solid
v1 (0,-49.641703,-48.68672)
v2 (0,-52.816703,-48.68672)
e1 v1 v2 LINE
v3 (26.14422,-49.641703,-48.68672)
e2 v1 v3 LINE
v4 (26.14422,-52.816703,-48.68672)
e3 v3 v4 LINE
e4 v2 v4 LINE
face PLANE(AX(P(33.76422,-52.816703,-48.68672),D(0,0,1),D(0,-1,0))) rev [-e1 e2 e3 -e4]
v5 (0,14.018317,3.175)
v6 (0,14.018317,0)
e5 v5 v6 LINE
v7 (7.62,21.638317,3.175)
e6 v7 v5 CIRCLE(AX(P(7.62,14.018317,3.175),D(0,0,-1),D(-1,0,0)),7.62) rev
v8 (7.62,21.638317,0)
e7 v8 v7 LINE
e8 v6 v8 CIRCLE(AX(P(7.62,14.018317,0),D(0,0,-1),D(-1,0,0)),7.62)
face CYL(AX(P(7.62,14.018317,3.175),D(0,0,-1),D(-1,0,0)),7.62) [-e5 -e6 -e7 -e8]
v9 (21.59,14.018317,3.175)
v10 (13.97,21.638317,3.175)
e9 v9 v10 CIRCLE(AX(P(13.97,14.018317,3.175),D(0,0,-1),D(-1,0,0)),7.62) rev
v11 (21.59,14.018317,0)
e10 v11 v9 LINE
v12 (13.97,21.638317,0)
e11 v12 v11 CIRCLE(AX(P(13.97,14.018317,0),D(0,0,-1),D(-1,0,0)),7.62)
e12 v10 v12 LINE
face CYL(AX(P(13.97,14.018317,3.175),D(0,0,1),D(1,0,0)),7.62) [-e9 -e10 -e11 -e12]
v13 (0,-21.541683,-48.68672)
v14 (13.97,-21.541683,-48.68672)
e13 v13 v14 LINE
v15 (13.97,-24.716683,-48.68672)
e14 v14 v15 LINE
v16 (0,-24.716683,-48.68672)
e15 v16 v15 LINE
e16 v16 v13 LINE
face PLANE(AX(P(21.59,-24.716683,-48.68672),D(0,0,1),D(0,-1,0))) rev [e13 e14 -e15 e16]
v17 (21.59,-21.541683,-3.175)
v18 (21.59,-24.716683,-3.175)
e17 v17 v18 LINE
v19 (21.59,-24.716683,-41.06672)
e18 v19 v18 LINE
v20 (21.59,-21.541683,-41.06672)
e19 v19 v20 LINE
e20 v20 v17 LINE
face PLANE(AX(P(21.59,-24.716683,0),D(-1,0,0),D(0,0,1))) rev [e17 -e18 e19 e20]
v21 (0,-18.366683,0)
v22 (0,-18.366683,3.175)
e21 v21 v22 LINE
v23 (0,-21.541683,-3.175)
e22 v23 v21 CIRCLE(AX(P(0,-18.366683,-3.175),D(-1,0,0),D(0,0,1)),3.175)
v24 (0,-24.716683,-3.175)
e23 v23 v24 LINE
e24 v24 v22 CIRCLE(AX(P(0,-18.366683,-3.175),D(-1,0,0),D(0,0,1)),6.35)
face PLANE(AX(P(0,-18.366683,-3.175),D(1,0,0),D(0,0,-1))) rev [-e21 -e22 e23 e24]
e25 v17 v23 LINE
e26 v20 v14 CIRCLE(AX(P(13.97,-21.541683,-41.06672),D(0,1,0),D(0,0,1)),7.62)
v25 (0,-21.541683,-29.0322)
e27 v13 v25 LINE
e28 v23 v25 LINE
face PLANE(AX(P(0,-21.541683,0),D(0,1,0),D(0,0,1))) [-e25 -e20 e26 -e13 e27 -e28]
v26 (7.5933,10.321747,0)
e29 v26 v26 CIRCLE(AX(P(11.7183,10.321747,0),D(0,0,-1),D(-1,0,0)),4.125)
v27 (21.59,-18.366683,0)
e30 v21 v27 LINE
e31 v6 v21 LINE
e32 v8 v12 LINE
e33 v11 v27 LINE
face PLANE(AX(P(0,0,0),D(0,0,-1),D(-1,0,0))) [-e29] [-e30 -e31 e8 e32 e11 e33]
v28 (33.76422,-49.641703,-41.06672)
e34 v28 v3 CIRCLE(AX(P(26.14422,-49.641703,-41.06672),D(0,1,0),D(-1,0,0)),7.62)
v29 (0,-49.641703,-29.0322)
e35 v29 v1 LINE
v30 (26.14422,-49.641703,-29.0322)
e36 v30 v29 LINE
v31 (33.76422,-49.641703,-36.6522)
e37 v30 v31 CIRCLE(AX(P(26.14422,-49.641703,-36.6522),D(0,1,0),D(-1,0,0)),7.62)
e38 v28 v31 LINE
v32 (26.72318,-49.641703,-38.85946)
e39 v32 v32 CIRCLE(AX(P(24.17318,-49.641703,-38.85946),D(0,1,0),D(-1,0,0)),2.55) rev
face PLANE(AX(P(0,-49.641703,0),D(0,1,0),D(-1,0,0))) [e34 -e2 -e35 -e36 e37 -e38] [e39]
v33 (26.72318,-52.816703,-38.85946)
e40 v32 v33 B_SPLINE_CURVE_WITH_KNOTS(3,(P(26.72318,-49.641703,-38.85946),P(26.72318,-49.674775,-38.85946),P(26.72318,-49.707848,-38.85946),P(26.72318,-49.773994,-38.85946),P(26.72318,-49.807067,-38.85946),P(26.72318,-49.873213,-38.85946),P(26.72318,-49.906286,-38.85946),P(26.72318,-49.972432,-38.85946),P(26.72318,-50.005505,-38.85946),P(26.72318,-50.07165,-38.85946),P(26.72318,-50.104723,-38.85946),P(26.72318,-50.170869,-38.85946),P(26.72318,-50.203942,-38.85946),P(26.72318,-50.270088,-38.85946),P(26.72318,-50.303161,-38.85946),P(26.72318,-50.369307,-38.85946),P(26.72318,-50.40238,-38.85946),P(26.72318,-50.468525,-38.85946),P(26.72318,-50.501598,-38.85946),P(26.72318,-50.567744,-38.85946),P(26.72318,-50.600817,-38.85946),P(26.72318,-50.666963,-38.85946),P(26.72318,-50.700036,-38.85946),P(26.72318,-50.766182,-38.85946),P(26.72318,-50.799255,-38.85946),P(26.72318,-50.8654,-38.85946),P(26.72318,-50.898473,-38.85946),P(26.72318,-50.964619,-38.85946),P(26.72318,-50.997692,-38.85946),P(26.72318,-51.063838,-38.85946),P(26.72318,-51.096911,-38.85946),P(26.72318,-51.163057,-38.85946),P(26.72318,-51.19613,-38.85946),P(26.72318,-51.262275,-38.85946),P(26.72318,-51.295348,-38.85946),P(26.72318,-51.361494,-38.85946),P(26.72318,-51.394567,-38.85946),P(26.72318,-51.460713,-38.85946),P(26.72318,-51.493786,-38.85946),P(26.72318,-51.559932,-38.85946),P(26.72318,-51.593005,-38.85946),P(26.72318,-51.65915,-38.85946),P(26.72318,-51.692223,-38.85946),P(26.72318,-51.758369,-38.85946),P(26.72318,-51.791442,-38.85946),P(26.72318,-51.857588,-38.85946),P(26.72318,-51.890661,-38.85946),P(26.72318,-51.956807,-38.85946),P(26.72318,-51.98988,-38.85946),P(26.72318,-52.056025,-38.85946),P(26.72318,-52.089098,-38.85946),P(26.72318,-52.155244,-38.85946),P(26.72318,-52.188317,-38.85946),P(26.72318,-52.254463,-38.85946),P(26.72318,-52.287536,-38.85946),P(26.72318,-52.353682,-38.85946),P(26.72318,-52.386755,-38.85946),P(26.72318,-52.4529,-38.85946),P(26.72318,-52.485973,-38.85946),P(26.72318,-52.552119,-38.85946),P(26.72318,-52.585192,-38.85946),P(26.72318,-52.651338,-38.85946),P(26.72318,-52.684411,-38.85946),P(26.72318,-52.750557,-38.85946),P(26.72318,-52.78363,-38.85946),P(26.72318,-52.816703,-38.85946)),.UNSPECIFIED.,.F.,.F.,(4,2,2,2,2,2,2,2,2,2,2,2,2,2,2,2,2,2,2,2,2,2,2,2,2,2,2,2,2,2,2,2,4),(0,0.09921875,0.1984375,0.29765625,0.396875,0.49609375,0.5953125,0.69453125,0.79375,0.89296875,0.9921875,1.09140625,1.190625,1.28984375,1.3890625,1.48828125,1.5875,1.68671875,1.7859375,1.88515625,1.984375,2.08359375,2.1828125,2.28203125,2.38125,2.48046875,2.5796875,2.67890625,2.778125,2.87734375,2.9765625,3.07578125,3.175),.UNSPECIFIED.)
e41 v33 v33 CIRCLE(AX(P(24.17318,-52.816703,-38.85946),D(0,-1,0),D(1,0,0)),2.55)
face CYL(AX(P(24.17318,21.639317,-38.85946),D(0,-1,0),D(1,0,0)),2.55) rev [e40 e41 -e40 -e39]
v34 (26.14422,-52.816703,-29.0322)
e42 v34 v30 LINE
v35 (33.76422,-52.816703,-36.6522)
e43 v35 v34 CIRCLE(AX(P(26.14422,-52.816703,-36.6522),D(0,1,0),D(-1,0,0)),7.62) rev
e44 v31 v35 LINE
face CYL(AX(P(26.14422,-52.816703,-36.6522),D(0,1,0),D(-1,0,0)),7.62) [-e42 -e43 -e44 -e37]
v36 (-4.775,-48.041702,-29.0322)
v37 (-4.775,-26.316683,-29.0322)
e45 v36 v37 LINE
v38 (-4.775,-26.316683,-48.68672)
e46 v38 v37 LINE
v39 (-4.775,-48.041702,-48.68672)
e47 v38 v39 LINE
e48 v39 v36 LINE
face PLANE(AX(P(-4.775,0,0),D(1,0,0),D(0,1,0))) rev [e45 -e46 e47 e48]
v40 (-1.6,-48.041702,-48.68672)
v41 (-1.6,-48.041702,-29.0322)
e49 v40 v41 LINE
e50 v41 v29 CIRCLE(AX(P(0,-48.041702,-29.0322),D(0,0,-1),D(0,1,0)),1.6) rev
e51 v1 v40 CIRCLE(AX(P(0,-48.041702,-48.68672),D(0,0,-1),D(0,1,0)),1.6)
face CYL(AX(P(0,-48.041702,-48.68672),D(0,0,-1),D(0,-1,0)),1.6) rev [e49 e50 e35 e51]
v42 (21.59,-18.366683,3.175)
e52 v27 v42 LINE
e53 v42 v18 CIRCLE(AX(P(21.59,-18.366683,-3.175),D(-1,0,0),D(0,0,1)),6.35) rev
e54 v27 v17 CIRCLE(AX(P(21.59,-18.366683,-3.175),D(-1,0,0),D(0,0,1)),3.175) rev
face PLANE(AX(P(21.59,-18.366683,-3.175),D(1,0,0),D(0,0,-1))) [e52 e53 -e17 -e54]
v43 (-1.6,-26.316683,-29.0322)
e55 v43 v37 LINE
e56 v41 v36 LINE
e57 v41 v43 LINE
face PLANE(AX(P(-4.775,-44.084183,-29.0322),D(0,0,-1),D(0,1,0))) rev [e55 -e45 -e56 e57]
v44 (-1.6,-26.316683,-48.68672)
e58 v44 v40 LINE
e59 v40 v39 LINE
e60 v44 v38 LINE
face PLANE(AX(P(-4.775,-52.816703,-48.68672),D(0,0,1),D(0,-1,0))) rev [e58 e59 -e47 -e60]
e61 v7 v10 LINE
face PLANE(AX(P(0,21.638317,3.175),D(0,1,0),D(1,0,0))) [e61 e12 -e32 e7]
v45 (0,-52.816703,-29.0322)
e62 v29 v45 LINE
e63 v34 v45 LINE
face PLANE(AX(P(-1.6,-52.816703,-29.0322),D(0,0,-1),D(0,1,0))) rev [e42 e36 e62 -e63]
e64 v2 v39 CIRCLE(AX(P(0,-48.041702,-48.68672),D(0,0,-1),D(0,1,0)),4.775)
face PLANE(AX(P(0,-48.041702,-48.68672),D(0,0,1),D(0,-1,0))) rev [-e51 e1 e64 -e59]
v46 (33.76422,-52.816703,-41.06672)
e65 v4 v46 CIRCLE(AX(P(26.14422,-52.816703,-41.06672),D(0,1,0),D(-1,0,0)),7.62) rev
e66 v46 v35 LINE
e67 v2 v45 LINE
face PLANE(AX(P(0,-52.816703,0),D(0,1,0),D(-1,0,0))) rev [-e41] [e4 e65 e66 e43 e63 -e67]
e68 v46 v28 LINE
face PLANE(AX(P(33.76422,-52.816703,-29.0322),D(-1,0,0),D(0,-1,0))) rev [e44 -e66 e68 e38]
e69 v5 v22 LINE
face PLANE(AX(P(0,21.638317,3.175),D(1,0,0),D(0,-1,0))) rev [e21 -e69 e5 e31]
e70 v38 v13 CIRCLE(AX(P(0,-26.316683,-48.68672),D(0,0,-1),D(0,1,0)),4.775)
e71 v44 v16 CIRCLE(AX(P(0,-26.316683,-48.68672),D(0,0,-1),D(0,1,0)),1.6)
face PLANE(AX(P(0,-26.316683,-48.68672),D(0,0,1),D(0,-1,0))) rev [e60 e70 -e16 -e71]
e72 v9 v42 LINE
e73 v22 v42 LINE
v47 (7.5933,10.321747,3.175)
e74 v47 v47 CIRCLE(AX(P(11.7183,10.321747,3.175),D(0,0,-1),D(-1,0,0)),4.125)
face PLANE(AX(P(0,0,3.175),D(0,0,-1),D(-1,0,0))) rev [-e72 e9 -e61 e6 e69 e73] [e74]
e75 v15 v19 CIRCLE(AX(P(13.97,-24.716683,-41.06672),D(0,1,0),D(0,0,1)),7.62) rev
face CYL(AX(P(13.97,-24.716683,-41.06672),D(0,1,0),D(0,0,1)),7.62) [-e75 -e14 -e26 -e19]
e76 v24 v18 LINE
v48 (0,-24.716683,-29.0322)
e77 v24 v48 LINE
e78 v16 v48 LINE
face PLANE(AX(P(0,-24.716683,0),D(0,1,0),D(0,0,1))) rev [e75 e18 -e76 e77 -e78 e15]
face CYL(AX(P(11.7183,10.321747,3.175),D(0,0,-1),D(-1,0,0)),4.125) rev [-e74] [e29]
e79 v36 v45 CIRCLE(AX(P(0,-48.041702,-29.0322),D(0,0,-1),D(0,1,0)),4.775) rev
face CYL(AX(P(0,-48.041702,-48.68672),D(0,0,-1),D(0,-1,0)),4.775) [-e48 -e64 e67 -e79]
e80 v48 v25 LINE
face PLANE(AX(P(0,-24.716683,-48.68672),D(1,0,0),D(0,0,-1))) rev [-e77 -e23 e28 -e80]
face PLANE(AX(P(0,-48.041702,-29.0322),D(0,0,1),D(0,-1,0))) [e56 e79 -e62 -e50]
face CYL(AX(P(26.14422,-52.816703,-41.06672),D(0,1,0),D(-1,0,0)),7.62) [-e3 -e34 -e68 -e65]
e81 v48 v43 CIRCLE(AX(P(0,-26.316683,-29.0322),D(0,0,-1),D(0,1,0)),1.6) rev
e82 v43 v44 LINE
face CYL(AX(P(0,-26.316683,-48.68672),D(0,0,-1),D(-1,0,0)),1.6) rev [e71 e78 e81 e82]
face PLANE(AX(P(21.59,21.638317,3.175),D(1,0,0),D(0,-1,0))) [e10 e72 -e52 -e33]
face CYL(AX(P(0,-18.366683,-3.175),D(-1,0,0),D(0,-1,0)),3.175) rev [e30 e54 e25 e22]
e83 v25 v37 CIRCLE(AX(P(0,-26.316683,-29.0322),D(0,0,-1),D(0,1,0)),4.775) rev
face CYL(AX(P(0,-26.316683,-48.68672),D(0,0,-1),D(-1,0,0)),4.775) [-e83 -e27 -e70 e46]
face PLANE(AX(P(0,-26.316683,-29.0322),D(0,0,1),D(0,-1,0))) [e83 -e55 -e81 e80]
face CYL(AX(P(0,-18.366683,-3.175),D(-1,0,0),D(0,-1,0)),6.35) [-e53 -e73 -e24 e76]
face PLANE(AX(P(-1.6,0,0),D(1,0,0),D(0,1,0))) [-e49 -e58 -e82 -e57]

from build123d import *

# Parameters (mm, degrees)
SKETCH1_W                    = 21.59
SKETCH1_H                    = 43.18
SKETCH1_R                    = 4.124999878
BOSS_EXTRUDE1_DEPTH          = 3.175
EDGE_FLANGE1_STRIP_W         = 19.05
EDGE_FLANGE1_STRIP_H         = 3.175
EDGE_FLANGE1_STRIP_CUT_DEPTH = 21.59
EDGE_FLANGE1_DEPTH           = 21.59
EDGE_FLANGE2_DEPTH           = 19.65452
EDGE_FLANGE2_START           = 3.175
EDGE_FLANGE2_FLAT_DEPTH      = 3.175
EDGE_FLANGE3_STRIP_W         = 15.900000204
EDGE_FLANGE3_STRIP_H         = 3.175
EDGE_FLANGE3_STRIP_CUT_DEPTH = 19.65452
EDGE_FLANGE3_DEPTH           = 19.65452
CUT_EXTRUDE2_REACH           = 97.152
SKETCH11_R                   = 2.55
FILLET1_R                    = 7.62


# Sheet-metal steps are written as plain solids
with BuildPart() as part:
    # Sketch1 → Boss-Extrude1 (new body)
    with BuildSketch(Plane.XY):
        with Locations((10.795, 0.048317484)):
            Rectangle(SKETCH1_W, SKETCH1_H)
        with Locations(Location((11.7183, 10.32174739, 0), (0, 0, 180))):
            Circle(SKETCH1_R, mode=Mode.SUBTRACT)
    extrude(amount=BOSS_EXTRUDE1_DEPTH)

    # Edge-Flange1: sheet metal written as solids
    # Edge-Flange1 strip (on a plane across the edge) → Edge-Flange1 strip cut (cut)
    with BuildSketch(Plane(origin=(21.59, -21.541682516, 0), x_dir=(0, 1, 0), z_dir=(-1, 0, 0))):
        with Locations((-6.35, -1.5875)):
            Rectangle(EDGE_FLANGE1_STRIP_W, EDGE_FLANGE1_STRIP_H)
    extrude(amount=EDGE_FLANGE1_STRIP_CUT_DEPTH, mode=Mode.SUBTRACT)

    # Edge-Flange1 section (on a plane across the edge) → Edge-Flange1 (add)
    with BuildSketch(Plane(origin=(21.59, -21.541682516, 0), x_dir=(0, 1, 0), z_dir=(-1, 0, 0))):
        with BuildLine():
            Line((-3.175, 3.175), (-3.175, 48.68672))
            Line((-3.175, 48.68672), (0, 48.68672))
            Line((0, 48.68672), (0, 3.175))
            ThreePointArc((0, 3.175), (0.92993597, 0.92993597), (3.175, 0))
            Line((3.175, 0), (3.175, -3.175))
            ThreePointArc((3.175, -3.175), (-1.315128061, -1.315128061), (-3.175, 3.175))
        make_face()
    extrude(amount=EDGE_FLANGE1_DEPTH)

    # Edge-Flange2: sheet metal written as solids
    # Edge-Flange2 bend section (on a plane across the edge) → Edge-Flange2 (add)
    with BuildSketch(Plane(origin=(-1.600000102, -24.716682516, -29.0322), x_dir=(1, 0, 0), z_dir=(0, 0, -1))):
        with BuildLine():
            Line((-3.175, 1.600000102), (0, 1.600000102))
            ThreePointArc((0, 1.600000102), (0.46862918, 0.46862918), (1.600000102, 0))
            Line((1.600000102, 0), (1.600000102, -3.175))
            ThreePointArc((1.600000102, -3.175), (-1.77643485, -1.77643485), (-3.175, 1.600000102))
        make_face()
    extrude(amount=EDGE_FLANGE2_DEPTH)

    # Edge-Flange2 profile (on flange) → Edge-Flange2 flat (add)
    with BuildSketch(Plane(origin=(-1.600000102, -24.716682516, 0), x_dir=(0, 0, -1), z_dir=(-1, 0, 0)).offset(EDGE_FLANGE2_START)):
        Polygon((29.0322, 28.10002), (29.0322, 19.3675), (29.0322, 1.600000102), (48.68672, 1.600000102), (48.68672, 28.10002), align=None)
    extrude(amount=-EDGE_FLANGE2_FLAT_DEPTH)

    # Edge-Flange3: sheet metal written as solids
    # Edge-Flange3 strip (on a plane across the edge) → Edge-Flange3 strip cut (cut)
    with BuildSketch(Plane(origin=(-1.600000102, -52.816702516, -29.0322), x_dir=(0, 1, 0), z_dir=(0, 0, -1))):
        with Locations((-3.175, -1.5875)):
            Rectangle(EDGE_FLANGE3_STRIP_W, EDGE_FLANGE3_STRIP_H)
    extrude(amount=EDGE_FLANGE3_STRIP_CUT_DEPTH, mode=Mode.SUBTRACT)

    # Edge-Flange3 section (on a plane across the edge) → Edge-Flange3 (add)
    with BuildSketch(Plane(origin=(-1.600000102, -52.816702516, -29.0322), x_dir=(0, 1, 0), z_dir=(0, 0, -1))):
        with BuildLine():
            Line((0, 1.600000102), (0, 35.364220102))
            Line((0, 35.364220102), (3.175, 35.364220102))
            Line((3.175, 35.364220102), (3.175, 1.600000102))
            ThreePointArc((3.175, 1.600000102), (3.64362918, 0.46862918), (4.775000102, 0))
            Line((4.775000102, 0), (4.775000102, -3.175))
            ThreePointArc((4.775000102, -3.175), (1.39856515, -1.77643485), (0, 1.600000102))
        make_face()
    extrude(amount=EDGE_FLANGE3_DEPTH)

    # Sketch11 → Cut-Extrude2 (cut, up to next)
    with BuildSketch(Plane.XZ.offset(52.816702516), mode=Mode.PRIVATE) as cut_extrude2_sk1:
        with Locations((24.17318, -38.85946)):
            Circle(SKETCH11_R)
    cut_extrude2_tool1 = extrude(cut_extrude2_sk1.sketch, amount=-CUT_EXTRUDE2_REACH, mode=Mode.PRIVATE) & part.part
    add(cut_extrude2_tool1.solids().sort_by_distance((24.17318, -52.816703, -38.85946))[0], mode=Mode.SUBTRACT)

    # Fillet1
    fillet1_edges = [part.edges().sort_by_distance(p)[0] for p in [
        (0, 21.638317484, 1.5875),
        (21.59, 21.638317484, 1.5875),
        (21.59, -23.129182516, -48.68672),
        (33.76422, -51.229202516, -29.0322),
        (33.76422, -51.229202516, -48.68672),
    ]]
    fillet(fillet1_edges, radius=FILLET1_R)


solid = part.part
